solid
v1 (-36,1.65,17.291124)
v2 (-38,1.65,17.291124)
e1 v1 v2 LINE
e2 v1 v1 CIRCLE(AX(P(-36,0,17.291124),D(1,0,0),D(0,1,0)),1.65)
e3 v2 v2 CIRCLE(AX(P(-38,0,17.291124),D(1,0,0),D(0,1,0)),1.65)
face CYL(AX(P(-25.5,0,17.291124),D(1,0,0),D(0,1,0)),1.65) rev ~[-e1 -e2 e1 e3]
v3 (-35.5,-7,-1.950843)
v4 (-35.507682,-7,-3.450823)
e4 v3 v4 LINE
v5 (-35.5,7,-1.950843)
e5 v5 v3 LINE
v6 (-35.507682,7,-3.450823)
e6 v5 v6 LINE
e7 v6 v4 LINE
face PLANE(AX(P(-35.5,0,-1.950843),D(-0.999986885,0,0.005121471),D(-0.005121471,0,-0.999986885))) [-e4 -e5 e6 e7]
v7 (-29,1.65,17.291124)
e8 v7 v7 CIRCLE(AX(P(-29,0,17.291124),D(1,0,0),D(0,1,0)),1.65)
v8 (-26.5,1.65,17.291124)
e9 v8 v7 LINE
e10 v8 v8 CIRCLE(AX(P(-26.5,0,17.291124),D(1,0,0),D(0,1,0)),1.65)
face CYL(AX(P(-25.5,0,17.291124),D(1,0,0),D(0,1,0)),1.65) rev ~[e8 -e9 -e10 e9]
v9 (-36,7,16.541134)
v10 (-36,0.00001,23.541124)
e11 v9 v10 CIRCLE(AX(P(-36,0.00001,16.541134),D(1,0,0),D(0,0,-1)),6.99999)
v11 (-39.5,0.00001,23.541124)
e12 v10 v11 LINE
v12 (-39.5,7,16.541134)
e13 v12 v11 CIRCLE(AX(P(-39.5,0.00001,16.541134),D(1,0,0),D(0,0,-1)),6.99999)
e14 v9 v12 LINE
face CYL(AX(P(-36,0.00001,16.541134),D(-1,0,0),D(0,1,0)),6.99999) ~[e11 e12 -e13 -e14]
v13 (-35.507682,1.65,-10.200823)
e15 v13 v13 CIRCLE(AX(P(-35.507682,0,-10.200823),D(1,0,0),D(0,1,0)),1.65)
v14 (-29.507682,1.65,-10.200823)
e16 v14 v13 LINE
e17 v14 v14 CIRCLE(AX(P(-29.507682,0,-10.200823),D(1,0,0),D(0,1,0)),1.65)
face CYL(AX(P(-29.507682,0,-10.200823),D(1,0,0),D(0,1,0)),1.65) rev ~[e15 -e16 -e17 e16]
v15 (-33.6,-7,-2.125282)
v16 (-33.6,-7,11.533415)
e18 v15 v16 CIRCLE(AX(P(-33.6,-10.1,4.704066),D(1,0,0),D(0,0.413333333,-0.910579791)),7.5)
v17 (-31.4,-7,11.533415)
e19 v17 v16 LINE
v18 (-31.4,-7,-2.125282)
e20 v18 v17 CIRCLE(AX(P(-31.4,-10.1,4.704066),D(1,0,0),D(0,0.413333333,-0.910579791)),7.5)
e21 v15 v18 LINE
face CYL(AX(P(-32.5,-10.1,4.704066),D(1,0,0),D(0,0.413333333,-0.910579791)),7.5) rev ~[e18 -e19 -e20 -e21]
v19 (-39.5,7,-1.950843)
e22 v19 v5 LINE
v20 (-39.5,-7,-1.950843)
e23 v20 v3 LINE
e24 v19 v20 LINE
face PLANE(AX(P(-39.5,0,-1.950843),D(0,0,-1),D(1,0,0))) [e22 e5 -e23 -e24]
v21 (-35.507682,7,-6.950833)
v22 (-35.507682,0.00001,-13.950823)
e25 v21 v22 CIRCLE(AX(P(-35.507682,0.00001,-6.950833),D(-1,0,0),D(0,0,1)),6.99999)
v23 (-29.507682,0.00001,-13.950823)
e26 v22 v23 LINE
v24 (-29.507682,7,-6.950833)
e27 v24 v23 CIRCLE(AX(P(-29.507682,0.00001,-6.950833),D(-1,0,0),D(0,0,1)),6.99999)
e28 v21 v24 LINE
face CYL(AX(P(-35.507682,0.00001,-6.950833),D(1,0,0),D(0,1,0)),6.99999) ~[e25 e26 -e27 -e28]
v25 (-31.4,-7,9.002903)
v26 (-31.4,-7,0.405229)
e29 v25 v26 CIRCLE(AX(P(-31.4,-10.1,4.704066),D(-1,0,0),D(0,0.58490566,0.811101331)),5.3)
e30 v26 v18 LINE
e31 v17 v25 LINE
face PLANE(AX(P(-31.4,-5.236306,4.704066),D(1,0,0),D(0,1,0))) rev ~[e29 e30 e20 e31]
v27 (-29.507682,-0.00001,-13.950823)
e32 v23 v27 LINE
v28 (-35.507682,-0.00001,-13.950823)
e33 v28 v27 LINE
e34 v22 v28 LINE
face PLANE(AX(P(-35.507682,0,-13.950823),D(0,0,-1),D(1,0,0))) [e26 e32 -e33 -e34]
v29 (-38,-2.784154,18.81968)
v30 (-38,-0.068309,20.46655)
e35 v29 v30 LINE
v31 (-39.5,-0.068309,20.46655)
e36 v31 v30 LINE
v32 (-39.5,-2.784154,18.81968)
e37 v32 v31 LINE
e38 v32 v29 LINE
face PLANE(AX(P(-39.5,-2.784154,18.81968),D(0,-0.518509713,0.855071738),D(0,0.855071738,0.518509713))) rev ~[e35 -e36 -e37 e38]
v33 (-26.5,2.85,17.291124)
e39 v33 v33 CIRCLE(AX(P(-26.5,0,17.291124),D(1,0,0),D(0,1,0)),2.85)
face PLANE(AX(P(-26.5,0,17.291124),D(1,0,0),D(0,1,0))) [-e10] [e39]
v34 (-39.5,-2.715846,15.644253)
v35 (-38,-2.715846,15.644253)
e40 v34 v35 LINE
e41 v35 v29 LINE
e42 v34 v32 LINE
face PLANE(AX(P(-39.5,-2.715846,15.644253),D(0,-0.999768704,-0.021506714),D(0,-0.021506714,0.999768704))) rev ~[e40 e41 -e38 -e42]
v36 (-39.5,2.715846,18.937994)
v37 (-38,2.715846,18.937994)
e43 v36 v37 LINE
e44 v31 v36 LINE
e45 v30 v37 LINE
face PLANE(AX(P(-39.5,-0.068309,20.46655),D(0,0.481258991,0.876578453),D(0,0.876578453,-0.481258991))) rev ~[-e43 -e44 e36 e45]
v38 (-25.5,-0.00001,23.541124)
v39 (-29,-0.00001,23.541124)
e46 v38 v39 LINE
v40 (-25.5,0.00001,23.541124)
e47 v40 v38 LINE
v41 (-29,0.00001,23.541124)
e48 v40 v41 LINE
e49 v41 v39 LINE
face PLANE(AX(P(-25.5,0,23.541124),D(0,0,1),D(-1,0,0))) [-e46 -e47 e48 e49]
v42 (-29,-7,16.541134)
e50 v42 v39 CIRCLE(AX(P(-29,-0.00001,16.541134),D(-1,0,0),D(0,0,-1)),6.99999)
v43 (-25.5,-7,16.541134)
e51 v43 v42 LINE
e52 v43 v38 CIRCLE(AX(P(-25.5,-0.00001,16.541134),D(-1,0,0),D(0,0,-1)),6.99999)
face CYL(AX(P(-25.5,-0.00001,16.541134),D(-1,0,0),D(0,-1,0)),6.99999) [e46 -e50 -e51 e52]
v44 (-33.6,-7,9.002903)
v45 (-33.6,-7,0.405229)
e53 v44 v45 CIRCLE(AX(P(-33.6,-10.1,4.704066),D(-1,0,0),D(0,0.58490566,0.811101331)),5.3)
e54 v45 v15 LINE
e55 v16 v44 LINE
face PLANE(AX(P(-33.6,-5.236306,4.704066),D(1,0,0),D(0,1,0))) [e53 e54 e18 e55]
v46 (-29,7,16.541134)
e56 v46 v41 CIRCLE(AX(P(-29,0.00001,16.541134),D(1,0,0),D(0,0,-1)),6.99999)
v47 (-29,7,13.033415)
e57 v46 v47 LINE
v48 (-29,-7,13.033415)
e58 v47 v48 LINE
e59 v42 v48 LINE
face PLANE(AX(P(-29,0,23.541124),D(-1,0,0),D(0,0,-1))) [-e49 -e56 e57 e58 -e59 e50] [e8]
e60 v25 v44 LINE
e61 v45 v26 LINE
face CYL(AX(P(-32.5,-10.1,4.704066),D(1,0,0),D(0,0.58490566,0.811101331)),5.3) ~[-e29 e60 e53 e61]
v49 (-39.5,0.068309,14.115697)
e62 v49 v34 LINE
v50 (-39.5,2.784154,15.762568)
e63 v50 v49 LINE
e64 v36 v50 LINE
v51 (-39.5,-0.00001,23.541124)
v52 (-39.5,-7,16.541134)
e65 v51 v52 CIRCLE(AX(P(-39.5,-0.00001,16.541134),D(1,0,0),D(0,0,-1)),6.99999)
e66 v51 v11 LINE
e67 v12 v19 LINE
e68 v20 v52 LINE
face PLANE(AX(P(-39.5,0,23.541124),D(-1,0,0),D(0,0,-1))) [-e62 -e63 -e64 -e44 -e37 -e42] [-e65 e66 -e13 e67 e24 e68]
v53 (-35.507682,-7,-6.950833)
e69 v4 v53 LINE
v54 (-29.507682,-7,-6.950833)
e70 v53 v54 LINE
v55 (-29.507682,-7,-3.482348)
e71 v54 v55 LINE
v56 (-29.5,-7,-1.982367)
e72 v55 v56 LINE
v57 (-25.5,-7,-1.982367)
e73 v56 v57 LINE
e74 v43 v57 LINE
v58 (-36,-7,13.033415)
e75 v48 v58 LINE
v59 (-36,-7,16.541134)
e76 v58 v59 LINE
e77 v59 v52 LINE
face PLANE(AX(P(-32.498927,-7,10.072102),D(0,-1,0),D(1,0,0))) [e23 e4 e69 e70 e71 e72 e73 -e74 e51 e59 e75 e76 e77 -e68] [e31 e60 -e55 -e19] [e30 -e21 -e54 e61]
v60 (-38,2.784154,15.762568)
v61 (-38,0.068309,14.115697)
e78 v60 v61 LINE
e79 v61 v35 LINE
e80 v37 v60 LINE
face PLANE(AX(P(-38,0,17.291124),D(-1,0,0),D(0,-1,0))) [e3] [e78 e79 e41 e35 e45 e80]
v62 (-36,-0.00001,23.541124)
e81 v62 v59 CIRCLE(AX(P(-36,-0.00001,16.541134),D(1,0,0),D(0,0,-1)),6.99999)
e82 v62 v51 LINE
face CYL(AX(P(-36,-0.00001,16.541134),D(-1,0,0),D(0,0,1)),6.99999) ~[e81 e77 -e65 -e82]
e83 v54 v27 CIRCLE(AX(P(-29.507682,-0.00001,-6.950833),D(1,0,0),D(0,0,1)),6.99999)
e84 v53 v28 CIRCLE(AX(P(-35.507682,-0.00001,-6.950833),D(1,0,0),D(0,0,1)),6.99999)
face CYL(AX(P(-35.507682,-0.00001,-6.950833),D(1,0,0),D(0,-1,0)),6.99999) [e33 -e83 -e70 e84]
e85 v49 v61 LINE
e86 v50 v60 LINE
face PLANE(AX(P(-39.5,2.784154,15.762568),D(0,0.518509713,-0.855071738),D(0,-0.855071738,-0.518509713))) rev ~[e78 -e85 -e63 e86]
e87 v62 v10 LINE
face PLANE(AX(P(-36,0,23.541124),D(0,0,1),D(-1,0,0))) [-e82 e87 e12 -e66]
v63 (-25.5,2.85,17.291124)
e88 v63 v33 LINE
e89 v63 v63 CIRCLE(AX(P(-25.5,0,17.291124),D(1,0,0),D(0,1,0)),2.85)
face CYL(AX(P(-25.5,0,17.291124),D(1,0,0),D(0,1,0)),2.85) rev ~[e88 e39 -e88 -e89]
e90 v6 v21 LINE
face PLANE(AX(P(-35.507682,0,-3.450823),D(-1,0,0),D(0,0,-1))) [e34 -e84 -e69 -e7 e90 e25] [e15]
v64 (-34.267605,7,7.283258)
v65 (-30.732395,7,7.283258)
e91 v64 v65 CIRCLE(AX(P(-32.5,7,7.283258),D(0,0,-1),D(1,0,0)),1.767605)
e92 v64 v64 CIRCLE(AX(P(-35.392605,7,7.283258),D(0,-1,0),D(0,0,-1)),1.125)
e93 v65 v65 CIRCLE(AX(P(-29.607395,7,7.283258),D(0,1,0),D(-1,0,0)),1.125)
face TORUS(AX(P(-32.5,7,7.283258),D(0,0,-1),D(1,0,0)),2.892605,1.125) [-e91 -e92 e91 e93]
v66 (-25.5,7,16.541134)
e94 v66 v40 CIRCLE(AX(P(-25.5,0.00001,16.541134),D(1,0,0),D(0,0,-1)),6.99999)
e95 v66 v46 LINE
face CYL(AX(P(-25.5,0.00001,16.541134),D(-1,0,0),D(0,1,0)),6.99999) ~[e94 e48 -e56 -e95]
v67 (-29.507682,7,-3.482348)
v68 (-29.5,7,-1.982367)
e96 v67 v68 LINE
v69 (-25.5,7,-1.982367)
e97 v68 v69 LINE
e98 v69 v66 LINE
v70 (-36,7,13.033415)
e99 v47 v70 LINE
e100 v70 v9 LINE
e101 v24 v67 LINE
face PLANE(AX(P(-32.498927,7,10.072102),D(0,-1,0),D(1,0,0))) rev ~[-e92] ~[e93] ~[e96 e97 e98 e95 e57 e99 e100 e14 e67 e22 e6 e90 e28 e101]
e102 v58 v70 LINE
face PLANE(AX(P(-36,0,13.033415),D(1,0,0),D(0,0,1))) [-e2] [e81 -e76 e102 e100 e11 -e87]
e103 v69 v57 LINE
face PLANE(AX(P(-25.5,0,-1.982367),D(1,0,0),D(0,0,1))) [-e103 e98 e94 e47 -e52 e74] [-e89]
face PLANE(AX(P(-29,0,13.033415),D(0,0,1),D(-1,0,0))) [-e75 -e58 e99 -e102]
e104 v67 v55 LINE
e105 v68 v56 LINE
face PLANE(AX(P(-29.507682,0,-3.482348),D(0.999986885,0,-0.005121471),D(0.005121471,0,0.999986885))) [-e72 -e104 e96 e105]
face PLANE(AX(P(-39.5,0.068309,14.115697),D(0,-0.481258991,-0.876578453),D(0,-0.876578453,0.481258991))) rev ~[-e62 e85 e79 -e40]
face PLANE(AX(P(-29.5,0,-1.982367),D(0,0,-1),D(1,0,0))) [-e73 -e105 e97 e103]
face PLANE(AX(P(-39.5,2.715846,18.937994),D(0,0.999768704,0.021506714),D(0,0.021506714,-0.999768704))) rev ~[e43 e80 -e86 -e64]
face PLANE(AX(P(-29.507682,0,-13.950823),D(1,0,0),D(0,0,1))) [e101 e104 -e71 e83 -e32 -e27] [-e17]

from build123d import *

# Parameters (mm, degrees)
F1_DEPTH  = 7
F2_R      = 1.65
F3_DEPTH  = 25
F4_R      = 1.65
F5_DEPTH  = 25
F6_R      = 6.99999
F7_R      = 2.85
F8_DEPTH  = 1
F10_DEPTH = 1.5
F11_R     = 1.125
F13_R     = 1.125
F16_DEPTH = 25
F19_DEPTH = 1.1


# Not quite as in the source:
# - a fillet or chamfer is up to 0.001 mm smaller than in the source, because OpenCascade refuses the exact size
# - a feature names something its author has since deleted; it is built from what else it names


with BuildPart() as f1:
    # F0 (on Front) → F1 (new body, symmetric)
    with BuildSketch(Plane.XZ):
        Polygon((-39.5, 23.5411238112), (-39.5, 21.5411238112), (-39.5, -1.9508430529), (-35.5, -1.9508430529), (-35.5076822063, -3.4508233807), (-35.5076822063, -6.4508233807), (-29.5076822063, -6.4823476079), (-29.5076822063, -3.4823476079), (-29.5, -1.9823672801), (-25.5, -1.9823672801), (-25.5, 21.5411238112), (-25.5, 23.5411238112), (-29, 23.5411238112), (-29, 21.5334145057), (-29, 13.0334145057), (-36, 13.0334145057), (-36, 21.5411238112), (-36, 23.5411238112), align=None)
        Polygon((-29.5076822063, -6.4823476079), (-35.5076822063, -6.4508233807), (-35.5076822063, -13.9508233807), (-29.5076822063, -13.9508233807), align=None)
    extrude(amount=F1_DEPTH, both=True)

    # F2 (on face) → F3 (cut)
    with BuildSketch(Plane.YZ.offset(-29.5076822063)):
        with Locations((0, -10.2008233807)):
            Circle(F2_R)
    extrude(amount=-F3_DEPTH, mode=Mode.SUBTRACT)

    # F4 (on face) → F5 (cut)
    with BuildSketch(Plane.YZ.offset(-25.5)):
        with Locations((0, 17.2911238112)):
            Circle(F4_R)
    extrude(amount=-F5_DEPTH, mode=Mode.SUBTRACT)

    # F6 (radius 7 in the source; OpenCascade refuses exactly that, so slightly less here)
    f6_edges = [f1.edges().sort_by_distance(p)[0] for p in [
        (-37.75, -7, 23.541124),
        (-37.75, 7, 23.541124),
        (-27.25, 7, 23.541124),
        (-27.25, -7, 23.541124),
        (-32.507682, -7, -13.950823),
        (-32.507682, 7, -13.950823),
    ]]
    fillet(f6_edges, radius=F6_R)

    # F7 (on face) → F8 (cut)
    with BuildSketch(Plane.YZ.offset(-25.5)):
        with Locations((0, 17.2911238112)):
            Circle(F7_R)
    extrude(amount=-F8_DEPTH, mode=Mode.SUBTRACT)

    # F9 (on face) → F10 (cut)
    with BuildSketch(Plane(origin=(-39.5, 0, 0), x_dir=(0, -1, 0), z_dir=(-1, 0, 0))):
        Polygon((-0.0683087897, 14.1156973306), (2.7158456051, 15.6442534237), (2.7841543949, 18.8196799042), (0.0683087897, 20.4665502917), (-2.7158456051, 18.9379941986), (-2.7841543949, 15.7625677181), align=None)
    extrude(amount=-F10_DEPTH, mode=Mode.SUBTRACT)

    # F11 (on face) → F12 (revolve)
    with BuildSketch(Plane.XZ.offset(7)):
        with Locations((-35.5, 7.298982876)):
            Circle(F11_R)
    revolve(axis=Axis((-32.5, -7, 3.0412955625), (0, 0, -1)))

    # F13 (on face) → F14 (revolve)
    with BuildSketch(Plane(origin=(0, 7, 0), x_dir=(-1, 0, 0), z_dir=(0, 1, 0))):
        with Locations((29.6073952019, 7.2832577271)):
            Circle(F13_R)
    revolve(axis=Axis((-32.5, 7, 3.0412955625), (0, 0, -1)))

    # F15 (on face) → F16 (cut)
    with BuildSketch(Plane.XY.offset(13.0334145057)):
        Polygon((-25.5, -7), (-29, -7), (-36, -7), (-39.5, -7), (-39.5, -13.4261082858), (-25.5, -13.4261082858), align=None)
    extrude(amount=-F16_DEPTH, mode=Mode.SUBTRACT)

    # F18 (on offset) → F19 (cut, symmetric)
    with BuildSketch(Plane.YZ.offset(-32.5)):
        with BuildLine():
            ThreePointArc((-7, 9.0029031262), (-4.8, 4.7040660741), (-7, 0.4052290221))
            Line((-7, 0.4052290221), (-7, -2.1252823574))
            ThreePointArc((-7, -2.1252823574), (-2.6, 4.7040660741), (-7, 11.5334145057))
            Line((-7, 11.5334145057), (-7, 9.0029031262))
        make_face()
    extrude(amount=F19_DEPTH, both=True, mode=Mode.SUBTRACT)


solid = f1.part
